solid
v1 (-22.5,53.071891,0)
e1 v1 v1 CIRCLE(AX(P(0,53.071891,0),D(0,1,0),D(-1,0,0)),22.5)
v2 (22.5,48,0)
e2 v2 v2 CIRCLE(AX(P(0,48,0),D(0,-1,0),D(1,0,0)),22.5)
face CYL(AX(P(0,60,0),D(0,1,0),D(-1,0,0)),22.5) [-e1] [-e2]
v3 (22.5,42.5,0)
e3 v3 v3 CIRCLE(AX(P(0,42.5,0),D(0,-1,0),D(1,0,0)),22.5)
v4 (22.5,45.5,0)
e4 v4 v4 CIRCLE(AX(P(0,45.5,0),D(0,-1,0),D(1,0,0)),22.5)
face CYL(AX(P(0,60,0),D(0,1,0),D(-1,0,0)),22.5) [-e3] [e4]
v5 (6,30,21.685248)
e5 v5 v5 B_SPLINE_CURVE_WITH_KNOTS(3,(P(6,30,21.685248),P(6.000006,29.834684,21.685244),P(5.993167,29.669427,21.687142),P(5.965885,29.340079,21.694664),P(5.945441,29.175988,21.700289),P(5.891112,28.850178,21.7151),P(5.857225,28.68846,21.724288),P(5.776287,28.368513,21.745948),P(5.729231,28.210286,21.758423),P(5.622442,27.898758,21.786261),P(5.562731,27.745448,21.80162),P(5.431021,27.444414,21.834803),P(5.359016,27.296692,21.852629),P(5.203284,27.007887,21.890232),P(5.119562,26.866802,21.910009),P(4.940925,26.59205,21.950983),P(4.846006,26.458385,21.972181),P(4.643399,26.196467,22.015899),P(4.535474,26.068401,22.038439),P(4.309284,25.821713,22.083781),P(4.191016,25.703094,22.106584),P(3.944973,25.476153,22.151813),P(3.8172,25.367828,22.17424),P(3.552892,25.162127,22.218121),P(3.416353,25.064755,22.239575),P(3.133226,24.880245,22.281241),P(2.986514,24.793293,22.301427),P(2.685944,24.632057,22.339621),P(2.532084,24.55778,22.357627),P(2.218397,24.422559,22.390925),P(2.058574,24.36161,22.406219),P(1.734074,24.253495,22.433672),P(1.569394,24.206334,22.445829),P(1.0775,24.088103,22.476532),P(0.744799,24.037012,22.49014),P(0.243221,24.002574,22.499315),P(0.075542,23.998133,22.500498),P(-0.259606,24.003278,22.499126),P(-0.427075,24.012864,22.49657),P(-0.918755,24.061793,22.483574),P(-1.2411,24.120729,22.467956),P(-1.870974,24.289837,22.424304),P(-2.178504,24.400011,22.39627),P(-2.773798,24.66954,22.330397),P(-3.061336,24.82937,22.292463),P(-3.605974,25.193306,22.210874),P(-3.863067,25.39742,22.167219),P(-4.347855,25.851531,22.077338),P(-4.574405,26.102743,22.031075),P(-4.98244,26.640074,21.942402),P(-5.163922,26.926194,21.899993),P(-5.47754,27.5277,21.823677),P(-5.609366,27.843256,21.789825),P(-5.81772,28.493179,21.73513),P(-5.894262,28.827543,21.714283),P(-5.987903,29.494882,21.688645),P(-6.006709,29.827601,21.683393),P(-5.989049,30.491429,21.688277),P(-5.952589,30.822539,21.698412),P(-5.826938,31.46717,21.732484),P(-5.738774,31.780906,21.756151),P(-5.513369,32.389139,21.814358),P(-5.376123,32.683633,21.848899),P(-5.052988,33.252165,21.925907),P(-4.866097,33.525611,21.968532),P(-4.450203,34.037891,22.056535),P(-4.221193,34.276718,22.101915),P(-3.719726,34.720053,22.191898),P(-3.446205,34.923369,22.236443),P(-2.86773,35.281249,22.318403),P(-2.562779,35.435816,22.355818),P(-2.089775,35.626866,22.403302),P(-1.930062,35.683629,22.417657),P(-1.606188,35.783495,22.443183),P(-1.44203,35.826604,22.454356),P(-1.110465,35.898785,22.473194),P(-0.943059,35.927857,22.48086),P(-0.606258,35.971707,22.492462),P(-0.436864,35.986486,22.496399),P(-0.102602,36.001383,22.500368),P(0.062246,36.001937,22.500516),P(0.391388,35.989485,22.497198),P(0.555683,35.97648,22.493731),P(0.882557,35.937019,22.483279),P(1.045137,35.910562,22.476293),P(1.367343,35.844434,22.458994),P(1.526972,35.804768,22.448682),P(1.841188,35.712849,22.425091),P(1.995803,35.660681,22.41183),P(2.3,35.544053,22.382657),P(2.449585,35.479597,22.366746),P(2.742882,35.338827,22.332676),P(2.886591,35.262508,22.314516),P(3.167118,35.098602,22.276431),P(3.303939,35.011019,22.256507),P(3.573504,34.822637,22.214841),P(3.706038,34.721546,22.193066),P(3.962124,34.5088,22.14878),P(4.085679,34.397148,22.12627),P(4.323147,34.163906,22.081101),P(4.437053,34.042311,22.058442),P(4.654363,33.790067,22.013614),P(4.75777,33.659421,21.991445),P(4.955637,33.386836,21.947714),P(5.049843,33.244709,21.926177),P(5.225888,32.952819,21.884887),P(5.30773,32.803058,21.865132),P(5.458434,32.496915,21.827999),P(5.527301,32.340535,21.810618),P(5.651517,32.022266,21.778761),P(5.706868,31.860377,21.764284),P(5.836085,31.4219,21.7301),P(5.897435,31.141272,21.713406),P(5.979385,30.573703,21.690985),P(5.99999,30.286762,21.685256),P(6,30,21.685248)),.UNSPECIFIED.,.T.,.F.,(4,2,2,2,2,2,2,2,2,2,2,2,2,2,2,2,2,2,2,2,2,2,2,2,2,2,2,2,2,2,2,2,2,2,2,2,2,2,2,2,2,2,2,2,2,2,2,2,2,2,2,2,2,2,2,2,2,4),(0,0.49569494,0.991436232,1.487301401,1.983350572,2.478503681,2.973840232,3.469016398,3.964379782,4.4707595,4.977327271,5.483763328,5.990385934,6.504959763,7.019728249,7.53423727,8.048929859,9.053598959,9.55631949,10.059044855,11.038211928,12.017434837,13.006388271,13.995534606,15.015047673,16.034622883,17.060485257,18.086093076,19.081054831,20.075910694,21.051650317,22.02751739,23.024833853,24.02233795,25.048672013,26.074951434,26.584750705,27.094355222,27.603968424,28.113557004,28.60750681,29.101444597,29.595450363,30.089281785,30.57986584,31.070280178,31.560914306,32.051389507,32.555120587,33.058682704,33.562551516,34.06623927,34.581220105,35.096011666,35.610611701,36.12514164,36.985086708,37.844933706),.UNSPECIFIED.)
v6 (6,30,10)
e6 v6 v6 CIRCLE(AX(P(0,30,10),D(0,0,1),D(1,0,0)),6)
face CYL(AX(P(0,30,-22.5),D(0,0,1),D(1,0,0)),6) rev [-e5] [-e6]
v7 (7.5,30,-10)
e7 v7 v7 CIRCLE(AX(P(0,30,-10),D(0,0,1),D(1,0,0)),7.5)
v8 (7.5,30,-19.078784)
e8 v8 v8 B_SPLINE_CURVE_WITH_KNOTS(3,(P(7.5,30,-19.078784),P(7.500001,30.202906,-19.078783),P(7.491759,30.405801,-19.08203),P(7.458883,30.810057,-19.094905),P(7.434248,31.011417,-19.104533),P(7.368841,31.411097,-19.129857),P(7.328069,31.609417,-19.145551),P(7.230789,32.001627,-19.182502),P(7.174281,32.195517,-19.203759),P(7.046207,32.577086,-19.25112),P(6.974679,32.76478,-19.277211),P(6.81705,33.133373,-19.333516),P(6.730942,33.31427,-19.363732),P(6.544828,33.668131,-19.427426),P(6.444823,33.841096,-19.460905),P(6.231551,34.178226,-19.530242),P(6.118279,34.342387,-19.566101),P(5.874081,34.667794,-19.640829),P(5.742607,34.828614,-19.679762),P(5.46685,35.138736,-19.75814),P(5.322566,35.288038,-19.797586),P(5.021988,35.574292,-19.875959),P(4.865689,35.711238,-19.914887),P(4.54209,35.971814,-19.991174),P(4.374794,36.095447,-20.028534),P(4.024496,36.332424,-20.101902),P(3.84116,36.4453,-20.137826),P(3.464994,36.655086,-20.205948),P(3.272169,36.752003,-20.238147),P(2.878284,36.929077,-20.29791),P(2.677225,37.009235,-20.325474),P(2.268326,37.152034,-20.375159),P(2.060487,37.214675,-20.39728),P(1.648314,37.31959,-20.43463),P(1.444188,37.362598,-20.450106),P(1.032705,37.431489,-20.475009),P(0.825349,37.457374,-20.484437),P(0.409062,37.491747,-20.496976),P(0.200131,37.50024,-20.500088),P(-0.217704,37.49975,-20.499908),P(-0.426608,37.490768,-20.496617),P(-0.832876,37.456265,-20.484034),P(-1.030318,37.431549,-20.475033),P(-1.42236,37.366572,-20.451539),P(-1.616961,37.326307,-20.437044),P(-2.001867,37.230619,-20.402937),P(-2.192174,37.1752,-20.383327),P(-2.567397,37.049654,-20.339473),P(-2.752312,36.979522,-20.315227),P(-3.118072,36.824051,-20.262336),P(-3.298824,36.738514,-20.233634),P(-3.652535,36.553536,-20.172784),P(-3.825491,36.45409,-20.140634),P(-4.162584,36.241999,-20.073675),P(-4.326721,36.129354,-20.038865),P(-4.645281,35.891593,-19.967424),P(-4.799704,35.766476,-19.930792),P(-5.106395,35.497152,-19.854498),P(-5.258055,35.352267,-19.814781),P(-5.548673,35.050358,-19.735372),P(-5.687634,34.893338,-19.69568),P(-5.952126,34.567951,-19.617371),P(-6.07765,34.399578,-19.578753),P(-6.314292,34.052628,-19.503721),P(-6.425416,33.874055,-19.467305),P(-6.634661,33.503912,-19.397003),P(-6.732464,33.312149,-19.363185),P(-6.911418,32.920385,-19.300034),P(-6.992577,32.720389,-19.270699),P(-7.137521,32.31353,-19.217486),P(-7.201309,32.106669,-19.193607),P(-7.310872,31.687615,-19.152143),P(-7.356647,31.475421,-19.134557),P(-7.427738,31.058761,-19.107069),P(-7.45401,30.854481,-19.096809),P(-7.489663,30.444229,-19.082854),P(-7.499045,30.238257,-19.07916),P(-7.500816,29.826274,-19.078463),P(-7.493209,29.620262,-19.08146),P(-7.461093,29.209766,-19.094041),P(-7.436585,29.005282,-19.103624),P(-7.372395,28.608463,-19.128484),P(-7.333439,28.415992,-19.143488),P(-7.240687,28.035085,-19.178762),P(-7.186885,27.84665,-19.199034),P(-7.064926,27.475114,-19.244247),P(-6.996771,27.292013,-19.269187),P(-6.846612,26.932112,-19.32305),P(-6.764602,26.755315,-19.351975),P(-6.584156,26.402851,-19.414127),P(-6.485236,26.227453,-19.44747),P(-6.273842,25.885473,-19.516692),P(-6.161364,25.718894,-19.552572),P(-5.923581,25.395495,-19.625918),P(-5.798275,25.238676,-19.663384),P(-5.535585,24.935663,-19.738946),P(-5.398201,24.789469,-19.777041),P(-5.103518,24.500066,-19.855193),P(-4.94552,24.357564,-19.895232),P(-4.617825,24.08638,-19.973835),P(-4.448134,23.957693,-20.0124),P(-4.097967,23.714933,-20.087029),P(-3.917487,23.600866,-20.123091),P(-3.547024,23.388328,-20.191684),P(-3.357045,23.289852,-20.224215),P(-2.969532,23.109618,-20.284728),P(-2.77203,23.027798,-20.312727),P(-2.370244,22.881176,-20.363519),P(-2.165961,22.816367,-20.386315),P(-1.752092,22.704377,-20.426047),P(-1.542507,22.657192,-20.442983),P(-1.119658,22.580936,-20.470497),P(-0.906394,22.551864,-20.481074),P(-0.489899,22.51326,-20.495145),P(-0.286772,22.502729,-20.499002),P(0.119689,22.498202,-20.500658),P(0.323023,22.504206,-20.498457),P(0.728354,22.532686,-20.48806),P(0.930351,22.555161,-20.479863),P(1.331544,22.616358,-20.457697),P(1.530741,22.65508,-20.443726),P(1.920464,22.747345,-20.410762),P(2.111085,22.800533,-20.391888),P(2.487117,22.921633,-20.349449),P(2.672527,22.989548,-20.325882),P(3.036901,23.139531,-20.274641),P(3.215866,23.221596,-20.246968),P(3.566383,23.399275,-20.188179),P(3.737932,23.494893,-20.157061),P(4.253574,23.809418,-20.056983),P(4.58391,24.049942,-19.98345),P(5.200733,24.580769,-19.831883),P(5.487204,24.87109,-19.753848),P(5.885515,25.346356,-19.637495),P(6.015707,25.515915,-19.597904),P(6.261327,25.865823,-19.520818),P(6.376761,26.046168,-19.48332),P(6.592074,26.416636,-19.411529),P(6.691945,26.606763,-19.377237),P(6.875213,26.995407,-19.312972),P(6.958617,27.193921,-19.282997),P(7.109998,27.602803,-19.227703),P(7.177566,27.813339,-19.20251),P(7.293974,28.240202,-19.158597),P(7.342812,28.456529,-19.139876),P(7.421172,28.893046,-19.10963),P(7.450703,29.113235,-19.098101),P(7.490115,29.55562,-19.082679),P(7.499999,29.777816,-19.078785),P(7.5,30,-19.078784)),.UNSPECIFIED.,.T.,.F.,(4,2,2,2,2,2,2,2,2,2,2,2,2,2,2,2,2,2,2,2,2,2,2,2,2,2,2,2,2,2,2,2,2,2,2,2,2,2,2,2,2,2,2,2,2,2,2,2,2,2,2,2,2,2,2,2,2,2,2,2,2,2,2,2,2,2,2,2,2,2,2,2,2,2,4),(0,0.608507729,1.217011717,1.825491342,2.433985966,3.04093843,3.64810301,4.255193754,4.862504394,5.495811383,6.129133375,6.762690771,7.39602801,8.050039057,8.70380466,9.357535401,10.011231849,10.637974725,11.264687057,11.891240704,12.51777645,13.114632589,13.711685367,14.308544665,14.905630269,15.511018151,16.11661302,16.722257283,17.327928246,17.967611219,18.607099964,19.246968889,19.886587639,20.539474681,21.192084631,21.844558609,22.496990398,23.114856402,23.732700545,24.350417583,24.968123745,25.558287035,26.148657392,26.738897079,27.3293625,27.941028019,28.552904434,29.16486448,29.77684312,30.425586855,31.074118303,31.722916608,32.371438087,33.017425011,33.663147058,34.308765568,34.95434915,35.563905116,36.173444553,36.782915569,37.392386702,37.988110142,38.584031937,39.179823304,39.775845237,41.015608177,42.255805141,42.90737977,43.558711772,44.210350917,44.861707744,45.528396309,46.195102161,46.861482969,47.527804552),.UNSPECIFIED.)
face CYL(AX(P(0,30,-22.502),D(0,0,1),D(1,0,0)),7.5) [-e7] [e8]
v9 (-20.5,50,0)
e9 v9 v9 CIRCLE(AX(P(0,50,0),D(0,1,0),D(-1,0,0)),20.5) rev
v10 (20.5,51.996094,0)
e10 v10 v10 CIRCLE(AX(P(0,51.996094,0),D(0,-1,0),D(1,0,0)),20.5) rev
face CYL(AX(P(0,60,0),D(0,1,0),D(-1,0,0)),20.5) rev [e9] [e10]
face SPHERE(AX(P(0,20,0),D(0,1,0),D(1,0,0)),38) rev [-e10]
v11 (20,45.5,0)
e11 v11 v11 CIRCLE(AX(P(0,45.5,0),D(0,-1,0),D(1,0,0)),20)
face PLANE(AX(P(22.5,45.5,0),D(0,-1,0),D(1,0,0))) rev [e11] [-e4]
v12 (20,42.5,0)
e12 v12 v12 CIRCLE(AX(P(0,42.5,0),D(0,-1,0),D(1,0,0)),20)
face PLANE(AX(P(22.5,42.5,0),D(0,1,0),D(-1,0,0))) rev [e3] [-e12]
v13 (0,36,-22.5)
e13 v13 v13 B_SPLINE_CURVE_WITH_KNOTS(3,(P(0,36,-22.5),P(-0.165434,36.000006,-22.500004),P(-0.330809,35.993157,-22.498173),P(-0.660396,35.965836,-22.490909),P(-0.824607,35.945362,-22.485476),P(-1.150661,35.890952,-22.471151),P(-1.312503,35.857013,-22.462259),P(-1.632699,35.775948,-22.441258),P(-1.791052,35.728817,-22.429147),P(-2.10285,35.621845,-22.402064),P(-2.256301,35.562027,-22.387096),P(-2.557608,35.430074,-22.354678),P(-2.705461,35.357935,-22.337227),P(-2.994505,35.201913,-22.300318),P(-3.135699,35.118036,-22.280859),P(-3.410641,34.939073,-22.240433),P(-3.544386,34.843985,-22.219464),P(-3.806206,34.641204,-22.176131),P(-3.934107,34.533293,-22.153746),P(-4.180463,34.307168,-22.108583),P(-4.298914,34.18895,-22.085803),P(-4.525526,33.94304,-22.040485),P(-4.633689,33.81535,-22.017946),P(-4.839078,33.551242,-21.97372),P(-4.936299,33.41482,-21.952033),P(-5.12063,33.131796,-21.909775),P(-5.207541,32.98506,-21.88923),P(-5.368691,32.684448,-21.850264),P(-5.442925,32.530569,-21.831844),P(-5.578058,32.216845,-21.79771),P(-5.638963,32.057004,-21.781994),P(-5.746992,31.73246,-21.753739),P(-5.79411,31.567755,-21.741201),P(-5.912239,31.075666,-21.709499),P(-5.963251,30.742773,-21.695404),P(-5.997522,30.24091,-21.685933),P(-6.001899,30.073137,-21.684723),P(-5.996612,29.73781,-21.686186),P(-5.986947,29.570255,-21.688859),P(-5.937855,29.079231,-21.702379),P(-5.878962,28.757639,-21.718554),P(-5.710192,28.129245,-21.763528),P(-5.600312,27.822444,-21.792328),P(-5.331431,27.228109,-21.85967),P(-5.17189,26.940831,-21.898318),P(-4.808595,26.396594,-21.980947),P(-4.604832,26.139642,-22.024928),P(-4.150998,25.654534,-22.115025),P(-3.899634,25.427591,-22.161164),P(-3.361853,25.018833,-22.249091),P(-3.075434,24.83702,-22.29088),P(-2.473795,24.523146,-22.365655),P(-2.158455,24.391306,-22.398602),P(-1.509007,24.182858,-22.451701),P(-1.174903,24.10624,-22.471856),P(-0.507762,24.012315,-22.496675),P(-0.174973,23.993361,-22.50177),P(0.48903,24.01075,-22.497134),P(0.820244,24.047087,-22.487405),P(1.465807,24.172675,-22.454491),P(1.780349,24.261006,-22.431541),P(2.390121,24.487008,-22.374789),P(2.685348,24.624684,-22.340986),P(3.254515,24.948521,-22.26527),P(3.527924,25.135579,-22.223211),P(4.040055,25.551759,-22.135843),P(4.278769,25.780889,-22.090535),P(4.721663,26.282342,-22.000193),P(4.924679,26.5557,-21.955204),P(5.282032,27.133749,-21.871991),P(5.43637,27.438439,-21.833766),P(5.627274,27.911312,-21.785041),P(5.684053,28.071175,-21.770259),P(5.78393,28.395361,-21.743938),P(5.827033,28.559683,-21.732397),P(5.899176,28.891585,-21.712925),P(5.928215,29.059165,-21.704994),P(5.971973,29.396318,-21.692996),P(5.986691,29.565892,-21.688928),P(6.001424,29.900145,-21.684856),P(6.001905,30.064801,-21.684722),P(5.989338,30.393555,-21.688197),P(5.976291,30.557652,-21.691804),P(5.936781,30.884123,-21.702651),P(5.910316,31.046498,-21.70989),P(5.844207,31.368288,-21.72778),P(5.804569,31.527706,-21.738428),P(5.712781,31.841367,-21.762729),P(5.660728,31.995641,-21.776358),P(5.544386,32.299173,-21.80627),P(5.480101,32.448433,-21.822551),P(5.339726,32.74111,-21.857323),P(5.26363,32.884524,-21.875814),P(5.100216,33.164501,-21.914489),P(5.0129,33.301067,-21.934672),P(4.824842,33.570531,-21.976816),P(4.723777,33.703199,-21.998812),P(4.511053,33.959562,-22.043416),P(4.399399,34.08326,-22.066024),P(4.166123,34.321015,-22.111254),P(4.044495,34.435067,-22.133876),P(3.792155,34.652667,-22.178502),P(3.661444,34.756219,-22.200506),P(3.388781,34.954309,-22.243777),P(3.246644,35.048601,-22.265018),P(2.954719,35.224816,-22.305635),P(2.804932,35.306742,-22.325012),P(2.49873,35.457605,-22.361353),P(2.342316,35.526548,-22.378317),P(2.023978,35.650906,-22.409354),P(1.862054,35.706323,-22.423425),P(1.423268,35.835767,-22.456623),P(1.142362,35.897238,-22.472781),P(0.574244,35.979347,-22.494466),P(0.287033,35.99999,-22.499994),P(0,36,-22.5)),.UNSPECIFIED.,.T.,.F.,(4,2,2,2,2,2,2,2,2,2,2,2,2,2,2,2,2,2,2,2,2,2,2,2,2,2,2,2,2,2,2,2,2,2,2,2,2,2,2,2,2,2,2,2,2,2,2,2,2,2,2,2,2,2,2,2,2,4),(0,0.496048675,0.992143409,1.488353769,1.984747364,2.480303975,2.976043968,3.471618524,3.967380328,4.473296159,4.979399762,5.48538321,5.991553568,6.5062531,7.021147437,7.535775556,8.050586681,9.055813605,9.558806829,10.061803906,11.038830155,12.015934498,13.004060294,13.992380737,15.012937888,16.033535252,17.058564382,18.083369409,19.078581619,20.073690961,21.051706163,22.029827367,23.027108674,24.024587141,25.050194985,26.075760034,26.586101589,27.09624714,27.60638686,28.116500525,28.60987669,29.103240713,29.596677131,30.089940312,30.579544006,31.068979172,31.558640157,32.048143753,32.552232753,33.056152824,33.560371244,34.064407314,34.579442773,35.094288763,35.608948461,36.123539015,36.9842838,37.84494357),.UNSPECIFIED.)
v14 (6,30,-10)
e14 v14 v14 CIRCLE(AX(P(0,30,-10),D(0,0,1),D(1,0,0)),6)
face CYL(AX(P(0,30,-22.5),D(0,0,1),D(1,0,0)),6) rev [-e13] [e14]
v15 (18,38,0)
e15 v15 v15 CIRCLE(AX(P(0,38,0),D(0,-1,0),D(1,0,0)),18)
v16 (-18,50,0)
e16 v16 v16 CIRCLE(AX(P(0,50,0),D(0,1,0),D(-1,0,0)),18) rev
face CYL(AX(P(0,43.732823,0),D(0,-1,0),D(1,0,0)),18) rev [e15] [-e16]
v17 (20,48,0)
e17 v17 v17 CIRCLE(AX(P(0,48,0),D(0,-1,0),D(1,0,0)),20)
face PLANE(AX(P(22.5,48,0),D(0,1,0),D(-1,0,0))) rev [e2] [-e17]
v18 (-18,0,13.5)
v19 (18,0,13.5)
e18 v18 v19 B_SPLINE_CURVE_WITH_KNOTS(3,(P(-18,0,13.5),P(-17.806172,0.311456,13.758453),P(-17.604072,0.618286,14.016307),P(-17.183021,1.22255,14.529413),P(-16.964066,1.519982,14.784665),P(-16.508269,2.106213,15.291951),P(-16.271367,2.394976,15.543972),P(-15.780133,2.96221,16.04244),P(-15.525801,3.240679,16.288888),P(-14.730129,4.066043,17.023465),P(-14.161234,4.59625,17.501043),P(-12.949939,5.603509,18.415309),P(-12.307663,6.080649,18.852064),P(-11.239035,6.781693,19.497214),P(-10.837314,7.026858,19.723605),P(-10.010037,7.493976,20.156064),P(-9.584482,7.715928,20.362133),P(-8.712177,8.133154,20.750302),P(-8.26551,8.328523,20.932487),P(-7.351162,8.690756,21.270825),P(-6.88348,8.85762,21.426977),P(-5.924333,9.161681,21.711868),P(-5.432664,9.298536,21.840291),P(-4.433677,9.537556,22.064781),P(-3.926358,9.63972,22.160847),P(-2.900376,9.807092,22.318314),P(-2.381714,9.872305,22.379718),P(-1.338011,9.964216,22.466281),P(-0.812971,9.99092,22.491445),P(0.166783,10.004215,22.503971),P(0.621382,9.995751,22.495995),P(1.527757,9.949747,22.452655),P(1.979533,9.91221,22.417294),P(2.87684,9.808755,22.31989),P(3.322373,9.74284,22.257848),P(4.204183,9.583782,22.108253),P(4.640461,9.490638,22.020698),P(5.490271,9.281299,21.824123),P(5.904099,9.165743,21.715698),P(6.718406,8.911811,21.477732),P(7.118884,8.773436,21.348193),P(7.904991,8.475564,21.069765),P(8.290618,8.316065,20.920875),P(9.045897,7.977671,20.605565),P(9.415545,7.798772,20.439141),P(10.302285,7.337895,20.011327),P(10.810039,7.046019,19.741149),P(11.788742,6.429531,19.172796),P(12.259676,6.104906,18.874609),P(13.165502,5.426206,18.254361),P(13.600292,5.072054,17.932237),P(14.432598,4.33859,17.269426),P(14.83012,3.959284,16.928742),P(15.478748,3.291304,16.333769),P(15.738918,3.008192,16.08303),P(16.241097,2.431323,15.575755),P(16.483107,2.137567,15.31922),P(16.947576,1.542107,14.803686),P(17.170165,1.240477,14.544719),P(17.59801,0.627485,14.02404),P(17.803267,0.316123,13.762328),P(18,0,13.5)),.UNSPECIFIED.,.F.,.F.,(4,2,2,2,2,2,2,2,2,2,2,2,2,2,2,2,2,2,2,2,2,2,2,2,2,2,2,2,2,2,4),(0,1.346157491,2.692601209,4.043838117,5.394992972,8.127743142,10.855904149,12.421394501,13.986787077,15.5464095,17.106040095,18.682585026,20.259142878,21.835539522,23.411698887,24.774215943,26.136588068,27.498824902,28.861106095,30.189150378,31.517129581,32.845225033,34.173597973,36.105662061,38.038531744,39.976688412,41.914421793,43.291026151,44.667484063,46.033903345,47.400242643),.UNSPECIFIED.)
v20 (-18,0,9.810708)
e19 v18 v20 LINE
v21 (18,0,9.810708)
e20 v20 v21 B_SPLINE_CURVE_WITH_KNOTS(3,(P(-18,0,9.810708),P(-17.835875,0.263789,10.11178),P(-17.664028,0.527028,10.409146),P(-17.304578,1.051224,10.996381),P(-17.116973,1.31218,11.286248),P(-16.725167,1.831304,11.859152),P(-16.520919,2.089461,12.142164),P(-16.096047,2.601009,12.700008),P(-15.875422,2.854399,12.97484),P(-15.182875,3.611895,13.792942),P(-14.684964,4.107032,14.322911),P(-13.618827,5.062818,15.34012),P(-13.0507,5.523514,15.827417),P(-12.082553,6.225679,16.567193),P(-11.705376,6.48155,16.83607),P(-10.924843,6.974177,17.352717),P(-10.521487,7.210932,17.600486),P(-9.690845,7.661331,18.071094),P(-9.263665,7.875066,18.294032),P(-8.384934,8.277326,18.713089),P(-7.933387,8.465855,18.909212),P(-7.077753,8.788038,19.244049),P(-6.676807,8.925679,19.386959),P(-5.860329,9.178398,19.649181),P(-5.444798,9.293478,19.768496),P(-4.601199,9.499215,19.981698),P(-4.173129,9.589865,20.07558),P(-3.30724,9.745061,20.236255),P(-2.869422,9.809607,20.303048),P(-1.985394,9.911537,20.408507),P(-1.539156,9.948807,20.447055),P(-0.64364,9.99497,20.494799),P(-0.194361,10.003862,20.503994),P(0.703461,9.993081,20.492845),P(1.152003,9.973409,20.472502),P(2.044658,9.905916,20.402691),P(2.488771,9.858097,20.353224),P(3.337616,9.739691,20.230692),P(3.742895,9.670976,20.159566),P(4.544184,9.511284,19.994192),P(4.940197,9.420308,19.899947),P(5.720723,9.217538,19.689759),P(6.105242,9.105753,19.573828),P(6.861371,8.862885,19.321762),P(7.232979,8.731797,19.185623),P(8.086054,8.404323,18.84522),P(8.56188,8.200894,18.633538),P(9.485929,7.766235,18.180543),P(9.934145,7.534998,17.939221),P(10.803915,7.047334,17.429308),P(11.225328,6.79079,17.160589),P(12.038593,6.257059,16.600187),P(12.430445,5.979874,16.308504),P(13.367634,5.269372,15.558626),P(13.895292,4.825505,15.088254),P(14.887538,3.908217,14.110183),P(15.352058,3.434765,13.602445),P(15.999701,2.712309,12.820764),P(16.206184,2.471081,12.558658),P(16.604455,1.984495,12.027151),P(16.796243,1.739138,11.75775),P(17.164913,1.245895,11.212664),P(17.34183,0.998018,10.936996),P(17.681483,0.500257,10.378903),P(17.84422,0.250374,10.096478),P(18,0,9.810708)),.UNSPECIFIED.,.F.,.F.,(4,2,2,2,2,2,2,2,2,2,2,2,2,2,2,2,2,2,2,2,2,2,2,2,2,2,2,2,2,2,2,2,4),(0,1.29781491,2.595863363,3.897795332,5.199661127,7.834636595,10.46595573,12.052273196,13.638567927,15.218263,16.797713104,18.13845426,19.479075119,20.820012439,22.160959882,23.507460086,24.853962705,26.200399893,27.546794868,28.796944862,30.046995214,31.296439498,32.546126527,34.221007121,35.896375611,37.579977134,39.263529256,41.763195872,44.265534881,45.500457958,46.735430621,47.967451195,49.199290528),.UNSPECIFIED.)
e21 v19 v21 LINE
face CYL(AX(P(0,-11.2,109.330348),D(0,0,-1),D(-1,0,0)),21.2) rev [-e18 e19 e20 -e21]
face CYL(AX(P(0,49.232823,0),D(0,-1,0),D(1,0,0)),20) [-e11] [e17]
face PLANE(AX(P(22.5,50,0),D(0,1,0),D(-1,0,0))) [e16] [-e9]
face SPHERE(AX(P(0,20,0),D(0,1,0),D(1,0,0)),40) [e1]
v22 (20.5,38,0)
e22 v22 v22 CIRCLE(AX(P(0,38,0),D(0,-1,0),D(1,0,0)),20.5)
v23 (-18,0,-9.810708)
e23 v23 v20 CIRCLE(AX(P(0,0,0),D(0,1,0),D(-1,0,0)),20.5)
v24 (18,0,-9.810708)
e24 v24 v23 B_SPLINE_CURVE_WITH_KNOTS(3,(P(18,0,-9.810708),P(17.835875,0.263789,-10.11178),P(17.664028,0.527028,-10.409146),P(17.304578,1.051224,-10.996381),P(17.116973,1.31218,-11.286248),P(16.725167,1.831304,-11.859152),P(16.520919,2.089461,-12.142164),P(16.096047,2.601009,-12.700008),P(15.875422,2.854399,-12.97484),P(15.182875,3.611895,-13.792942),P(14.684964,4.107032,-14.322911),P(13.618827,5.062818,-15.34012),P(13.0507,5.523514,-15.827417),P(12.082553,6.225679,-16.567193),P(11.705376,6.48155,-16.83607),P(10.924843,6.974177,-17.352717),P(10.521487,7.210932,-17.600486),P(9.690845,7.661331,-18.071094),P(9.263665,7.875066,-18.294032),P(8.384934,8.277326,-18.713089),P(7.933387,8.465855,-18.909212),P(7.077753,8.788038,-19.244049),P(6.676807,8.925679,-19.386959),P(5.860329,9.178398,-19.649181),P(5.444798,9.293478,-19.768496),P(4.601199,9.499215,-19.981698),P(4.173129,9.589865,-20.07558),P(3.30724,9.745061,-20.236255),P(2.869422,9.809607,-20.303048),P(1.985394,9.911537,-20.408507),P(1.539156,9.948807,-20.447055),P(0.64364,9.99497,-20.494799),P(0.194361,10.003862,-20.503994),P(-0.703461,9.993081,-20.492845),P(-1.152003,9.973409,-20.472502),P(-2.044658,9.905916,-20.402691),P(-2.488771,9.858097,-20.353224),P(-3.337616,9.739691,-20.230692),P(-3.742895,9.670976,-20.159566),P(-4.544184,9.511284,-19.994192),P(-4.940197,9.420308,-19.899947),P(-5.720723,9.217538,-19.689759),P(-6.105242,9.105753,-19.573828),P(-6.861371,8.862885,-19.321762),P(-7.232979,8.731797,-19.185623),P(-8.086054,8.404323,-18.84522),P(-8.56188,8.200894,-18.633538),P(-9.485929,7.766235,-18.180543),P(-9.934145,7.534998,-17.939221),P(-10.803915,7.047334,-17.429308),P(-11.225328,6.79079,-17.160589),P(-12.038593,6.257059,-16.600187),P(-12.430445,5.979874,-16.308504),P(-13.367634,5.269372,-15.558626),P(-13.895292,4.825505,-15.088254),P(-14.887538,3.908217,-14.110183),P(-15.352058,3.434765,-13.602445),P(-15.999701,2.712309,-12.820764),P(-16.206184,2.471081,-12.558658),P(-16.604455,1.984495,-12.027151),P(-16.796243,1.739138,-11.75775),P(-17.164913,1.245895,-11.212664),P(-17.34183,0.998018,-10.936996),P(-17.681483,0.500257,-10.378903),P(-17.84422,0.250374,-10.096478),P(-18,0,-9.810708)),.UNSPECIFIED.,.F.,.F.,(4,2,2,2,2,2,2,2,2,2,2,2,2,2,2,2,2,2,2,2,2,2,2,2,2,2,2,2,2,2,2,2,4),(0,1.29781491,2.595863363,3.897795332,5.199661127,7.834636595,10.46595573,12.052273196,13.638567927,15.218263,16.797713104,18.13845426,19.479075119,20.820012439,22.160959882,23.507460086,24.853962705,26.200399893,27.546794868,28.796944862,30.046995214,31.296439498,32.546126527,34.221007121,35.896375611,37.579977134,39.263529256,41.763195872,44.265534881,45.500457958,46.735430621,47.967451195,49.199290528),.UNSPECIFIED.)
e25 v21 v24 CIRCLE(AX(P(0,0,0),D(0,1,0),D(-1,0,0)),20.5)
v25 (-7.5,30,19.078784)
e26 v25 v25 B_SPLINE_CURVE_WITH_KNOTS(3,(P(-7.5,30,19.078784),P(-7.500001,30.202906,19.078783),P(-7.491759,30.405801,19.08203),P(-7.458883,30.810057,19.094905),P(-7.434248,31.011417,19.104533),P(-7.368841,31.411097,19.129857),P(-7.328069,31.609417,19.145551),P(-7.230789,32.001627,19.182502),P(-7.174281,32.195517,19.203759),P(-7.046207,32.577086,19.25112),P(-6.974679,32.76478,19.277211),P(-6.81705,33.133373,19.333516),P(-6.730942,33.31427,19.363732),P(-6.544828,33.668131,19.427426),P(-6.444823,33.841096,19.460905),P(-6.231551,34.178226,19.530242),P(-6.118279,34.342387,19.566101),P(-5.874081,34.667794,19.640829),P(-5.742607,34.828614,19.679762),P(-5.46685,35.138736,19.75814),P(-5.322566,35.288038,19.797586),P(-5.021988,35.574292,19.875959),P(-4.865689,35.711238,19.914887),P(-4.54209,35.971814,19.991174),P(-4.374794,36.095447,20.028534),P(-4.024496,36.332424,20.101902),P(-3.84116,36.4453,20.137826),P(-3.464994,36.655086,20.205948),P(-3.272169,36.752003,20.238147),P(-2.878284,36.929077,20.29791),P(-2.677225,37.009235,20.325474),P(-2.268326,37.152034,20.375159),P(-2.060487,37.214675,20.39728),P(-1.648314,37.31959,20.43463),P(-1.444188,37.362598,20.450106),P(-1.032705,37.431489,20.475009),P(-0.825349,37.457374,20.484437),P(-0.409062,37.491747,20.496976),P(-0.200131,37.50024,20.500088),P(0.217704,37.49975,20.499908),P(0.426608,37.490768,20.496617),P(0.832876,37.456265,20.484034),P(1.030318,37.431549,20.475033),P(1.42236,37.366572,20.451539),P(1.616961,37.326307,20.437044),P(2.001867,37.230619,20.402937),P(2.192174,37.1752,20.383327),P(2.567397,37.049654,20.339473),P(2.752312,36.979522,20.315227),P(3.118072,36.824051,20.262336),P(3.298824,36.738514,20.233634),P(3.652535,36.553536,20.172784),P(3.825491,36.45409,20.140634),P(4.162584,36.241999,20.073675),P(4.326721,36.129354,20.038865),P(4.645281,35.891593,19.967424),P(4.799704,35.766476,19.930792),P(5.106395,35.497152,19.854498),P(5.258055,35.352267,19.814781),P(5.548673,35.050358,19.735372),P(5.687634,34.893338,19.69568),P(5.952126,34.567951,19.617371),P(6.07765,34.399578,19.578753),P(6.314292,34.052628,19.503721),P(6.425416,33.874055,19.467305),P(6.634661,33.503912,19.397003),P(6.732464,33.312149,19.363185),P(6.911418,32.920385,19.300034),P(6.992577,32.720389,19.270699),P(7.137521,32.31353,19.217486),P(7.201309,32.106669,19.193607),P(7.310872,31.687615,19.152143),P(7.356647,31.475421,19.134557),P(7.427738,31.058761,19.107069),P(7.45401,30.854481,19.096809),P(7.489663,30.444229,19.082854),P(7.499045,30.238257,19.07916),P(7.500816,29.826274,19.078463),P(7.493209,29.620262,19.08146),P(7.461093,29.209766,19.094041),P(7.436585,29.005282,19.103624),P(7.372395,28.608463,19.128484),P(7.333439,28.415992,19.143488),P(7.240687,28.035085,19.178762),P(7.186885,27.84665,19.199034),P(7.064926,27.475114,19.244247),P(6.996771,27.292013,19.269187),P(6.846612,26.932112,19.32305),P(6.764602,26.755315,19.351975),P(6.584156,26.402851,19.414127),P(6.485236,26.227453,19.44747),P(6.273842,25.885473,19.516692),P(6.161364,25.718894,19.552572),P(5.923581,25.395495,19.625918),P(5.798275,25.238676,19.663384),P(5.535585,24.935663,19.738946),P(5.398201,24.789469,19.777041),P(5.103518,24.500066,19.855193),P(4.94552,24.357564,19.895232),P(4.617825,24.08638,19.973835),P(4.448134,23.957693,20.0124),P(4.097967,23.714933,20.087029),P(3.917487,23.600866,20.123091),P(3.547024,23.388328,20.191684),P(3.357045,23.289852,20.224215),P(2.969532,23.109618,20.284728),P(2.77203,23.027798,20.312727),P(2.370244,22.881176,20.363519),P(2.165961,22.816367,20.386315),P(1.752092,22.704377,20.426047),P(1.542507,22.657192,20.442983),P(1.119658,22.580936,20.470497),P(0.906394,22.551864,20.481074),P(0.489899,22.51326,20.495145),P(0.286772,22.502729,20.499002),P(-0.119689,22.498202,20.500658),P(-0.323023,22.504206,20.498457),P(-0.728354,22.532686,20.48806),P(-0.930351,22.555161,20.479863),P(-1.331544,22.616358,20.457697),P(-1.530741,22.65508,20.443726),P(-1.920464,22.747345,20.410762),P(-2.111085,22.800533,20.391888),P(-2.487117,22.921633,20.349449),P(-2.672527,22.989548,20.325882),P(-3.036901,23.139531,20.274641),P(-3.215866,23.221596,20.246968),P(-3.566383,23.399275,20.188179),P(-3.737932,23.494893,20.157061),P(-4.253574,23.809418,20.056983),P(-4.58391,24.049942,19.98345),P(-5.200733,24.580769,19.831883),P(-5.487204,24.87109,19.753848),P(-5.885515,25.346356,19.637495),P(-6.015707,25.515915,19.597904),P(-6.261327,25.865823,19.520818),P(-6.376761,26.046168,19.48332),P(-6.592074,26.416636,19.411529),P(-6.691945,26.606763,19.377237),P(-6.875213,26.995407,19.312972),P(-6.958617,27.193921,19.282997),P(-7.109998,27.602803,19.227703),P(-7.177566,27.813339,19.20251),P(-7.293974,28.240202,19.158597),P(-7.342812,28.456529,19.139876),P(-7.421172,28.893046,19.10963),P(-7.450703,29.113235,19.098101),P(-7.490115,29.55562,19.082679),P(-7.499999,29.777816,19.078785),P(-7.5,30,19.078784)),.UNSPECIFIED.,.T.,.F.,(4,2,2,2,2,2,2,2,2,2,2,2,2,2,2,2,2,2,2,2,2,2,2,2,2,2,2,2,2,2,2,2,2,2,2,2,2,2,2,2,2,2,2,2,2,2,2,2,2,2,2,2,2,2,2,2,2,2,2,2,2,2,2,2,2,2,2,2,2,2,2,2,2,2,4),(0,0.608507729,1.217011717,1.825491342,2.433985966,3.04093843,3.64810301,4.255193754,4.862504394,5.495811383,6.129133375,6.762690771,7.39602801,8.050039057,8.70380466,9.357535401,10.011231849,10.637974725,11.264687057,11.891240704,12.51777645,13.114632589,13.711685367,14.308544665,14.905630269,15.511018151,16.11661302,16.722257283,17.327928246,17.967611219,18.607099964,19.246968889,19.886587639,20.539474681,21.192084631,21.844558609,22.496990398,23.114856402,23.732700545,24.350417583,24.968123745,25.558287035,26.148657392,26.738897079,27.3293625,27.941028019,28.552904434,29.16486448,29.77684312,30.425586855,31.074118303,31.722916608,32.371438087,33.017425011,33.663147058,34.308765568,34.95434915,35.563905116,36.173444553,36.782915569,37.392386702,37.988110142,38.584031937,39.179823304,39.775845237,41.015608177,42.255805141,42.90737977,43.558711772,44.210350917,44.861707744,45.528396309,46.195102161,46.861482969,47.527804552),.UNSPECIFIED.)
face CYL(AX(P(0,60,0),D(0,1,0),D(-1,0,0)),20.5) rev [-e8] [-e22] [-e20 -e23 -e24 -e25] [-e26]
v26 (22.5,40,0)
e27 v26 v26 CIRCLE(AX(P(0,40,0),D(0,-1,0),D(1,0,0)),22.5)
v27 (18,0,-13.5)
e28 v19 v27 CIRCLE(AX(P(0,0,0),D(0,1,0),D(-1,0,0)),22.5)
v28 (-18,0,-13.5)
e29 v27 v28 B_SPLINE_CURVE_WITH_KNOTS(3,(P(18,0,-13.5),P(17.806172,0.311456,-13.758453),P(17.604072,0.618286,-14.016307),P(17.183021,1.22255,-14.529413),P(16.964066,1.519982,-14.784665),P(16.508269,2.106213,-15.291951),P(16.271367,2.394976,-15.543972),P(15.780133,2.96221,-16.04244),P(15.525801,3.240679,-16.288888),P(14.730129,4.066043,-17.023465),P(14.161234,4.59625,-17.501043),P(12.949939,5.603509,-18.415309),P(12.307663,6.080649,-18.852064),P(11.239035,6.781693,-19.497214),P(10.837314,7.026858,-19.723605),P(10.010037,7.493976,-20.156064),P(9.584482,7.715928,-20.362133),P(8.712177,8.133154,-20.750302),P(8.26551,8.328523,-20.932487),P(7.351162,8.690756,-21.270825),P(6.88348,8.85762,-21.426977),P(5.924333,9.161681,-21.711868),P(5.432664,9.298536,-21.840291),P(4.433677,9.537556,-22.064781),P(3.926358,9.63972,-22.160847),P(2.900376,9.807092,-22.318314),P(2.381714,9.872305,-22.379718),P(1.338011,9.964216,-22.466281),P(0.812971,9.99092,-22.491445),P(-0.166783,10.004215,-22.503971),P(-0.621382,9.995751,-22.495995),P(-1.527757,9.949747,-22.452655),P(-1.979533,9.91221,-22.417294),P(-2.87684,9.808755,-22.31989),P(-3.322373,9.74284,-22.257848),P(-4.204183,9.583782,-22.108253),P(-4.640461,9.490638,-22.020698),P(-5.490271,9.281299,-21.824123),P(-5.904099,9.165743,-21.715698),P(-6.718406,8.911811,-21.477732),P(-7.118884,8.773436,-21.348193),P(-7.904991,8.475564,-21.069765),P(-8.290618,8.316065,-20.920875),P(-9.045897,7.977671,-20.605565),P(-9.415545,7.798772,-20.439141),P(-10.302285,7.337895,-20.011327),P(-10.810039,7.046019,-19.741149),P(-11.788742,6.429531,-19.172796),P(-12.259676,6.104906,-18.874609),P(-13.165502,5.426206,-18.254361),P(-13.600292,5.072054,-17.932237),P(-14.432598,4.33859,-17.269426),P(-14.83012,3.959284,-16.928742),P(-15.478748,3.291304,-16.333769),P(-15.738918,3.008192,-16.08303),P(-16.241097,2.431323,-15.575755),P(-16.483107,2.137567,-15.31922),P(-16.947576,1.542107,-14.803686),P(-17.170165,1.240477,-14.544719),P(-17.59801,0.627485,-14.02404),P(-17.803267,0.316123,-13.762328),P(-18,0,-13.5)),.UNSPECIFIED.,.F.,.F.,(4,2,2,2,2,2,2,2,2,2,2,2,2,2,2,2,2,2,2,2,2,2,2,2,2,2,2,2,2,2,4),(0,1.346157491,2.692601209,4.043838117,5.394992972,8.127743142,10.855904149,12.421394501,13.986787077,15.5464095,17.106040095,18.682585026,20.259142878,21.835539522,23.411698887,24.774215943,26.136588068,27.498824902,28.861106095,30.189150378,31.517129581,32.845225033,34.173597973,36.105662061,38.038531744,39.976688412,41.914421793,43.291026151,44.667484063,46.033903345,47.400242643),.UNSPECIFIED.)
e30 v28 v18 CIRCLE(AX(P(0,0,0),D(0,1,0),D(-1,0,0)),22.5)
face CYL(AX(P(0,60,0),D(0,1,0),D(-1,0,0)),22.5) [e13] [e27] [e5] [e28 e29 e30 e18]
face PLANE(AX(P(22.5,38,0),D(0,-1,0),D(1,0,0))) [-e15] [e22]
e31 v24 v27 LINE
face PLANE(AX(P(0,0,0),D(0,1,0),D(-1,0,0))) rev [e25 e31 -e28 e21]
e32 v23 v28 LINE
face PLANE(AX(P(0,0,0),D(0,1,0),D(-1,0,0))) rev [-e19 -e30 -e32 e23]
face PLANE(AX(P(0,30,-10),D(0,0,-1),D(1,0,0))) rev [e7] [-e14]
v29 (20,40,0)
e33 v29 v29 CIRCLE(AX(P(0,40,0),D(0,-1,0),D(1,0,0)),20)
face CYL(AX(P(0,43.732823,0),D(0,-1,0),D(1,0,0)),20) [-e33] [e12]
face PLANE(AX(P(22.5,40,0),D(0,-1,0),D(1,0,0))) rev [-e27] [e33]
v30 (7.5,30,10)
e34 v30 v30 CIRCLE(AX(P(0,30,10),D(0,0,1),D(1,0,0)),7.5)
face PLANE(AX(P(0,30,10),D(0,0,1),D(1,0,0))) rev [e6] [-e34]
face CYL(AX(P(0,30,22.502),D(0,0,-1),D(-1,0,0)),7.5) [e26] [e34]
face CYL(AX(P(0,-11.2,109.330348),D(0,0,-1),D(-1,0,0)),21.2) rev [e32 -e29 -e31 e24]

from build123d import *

# Parameters (mm, degrees)
SZKIC2_W                         = 2.5
SZKIC2_H                         = 2.5
SZYK_LINIOWY1_COUNT              = 2
SZYK_LINIOWY1_PITCH              = 5.5
WYTNIJ_WYCI_GNI_CIE1_DEPTH       = 68.915388536
WYTNIJ_WYCI_GNI_CIE1_DEPTH_BACK  = 68.915388536
WYTNIJ_WYCI_GNI_CIE2_DEPTH       = 68.915388602
WYTNIJ_WYCI_GNI_CIE2_DEPTH_BACK  = 68.915388602
SZKIC4_R                         = 6
DODANIE_WYCI_GNI_CIE1_REACH      = 79.915
DODANIE_WYCI_GNI_CIE1_END_RADIUS = 20.5
DODANIE_WYCI_GNI_CIE1_START      = 10
SZKIC5_R                         = 7.5
SZKIC5_R_2                       = 6


# Read off the part's stored shape, not the designer's step: Skorupa1
with BuildPart() as part:
    # Szkic1 → Obrót1 (revolve)
    with BuildSketch(Plane.XY, mode=Mode.PRIVATE) as obr_t1_sk:
        with BuildLine():
            Line((0, 0), (22.5, 0))
            Line((22.5, 0), (22.5, 53.071891388))
            ThreePointArc((22.5, 53.071891388), (11.771243445, 58.228756555), (0, 60))
            Line((0, 60), (0, 0))
        make_face()
    revolve(obr_t1_sk.sketch.rotate(Axis((0, 60, 0), (0, -1, 0)), 180), axis=Axis((0, 60, 0), (0, -1, 0)))

    # Szkic2 → Wycięcie-obrót1 (revolve, cut)
    with BuildSketch(Plane.XY):
        with Locations((21.25, 41.25)):
            Rectangle(SZKIC2_W, SZKIC2_H)
    wyci_cie_obr_t1 = revolve(axis=Axis((0, 43.732823124, 0), (0, 1, 0)), mode=Mode.SUBTRACT)

    # Szyk liniowy1: Wycięcie-obrót1 ×2
    with Locations(*[(0, i * SZYK_LINIOWY1_PITCH, 0) for i in range(1, SZYK_LINIOWY1_COUNT)]):
        add(wyci_cie_obr_t1, mode=Mode.SUBTRACT)

    # Skorupa1 outline → Skorupa1 (revolve, cut)
    with BuildSketch(Plane.XY):
        with BuildLine():
            Line((20.5, 0), (20.5, 38))
            Line((20.5, 38), (18, 38))
            Line((18, 38), (18, 50))
            Line((18, 50), (20.5, 50))
            Line((20.5, 50), (20.500000011, 51.996093505))
            ThreePointArc((20.500000011, 51.996093505), (10.680553516, 56.468147425), (0, 58))
            Line((0, 58), (0, 0))
            Line((0, 0), (20.5, 0))
        make_face()
    revolve(axis=Axis((0, 0, 0), (0, 1, 0)), mode=Mode.SUBTRACT)

    # Szkic3 → Wytnij-wyciągnięcie1 (cut, two sides: drawn at the far end of the back side and taken through both)
    with BuildSketch(Plane.XY.offset(-WYTNIJ_WYCI_GNI_CIE1_DEPTH_BACK)):
        with BuildLine():
            Line((-99.770112831, -131.416252764), (-18, 0))
            ThreePointArc((-18, 0), (0, 10), (18, 0))
            Line((18, 0), (99.770112831, -131.416252764))
            Line((99.770112831, -131.416252764), (99.770112831, -440.974537052))
            Line((99.770112831, -440.974537052), (-99.770112831, -440.974537052))
            Line((-99.770112831, -440.974537052), (-99.770112831, -131.416252764))
        make_face()
    extrude(amount=WYTNIJ_WYCI_GNI_CIE1_DEPTH + WYTNIJ_WYCI_GNI_CIE1_DEPTH_BACK, mode=Mode.SUBTRACT)

    # Szkic4 → Wytnij-wyciągnięcie2 (cut, two sides: drawn at the far end of the back side and taken through both)
    with BuildSketch(Plane.XY.offset(-WYTNIJ_WYCI_GNI_CIE2_DEPTH_BACK)):
        with Locations((0, 30)):
            Circle(SZKIC4_R)
    extrude(amount=WYTNIJ_WYCI_GNI_CIE2_DEPTH + WYTNIJ_WYCI_GNI_CIE2_DEPTH_BACK, mode=Mode.SUBTRACT)

    # Dodanie-wyciągnięcie1: up to this cylinder (the profile starts inside it)
    dodanie_wyci_gni_cie1_end = Plane(origin=(0, 30, 0), z_dir=(0, 1, 0)) * Cylinder(DODANIE_WYCI_GNI_CIE1_END_RADIUS, 201.83, mode=Mode.PRIVATE)
    # Szkic5 → Dodanie-wyciągnięcie1 (add, up to the surface)
    with BuildSketch(Plane.XY.offset(DODANIE_WYCI_GNI_CIE1_START), mode=Mode.PRIVATE) as dodanie_wyci_gni_cie1_sk1:
        with Locations(Location((0, 30, 0), (0, 0, 180))):
            Circle(SZKIC5_R)
        with Locations((0, 30)):
            Circle(SZKIC5_R_2, mode=Mode.SUBTRACT)
    dodanie_wyci_gni_cie1_tool1 = extrude(dodanie_wyci_gni_cie1_sk1.sketch, amount=DODANIE_WYCI_GNI_CIE1_REACH, mode=Mode.PRIVATE) & dodanie_wyci_gni_cie1_end
    dodanie_wyci_gni_cie1 = dodanie_wyci_gni_cie1_tool1.solids().sort_by_distance((7.287868, 30, 10))[0]
    add(dodanie_wyci_gni_cie1)

    # Lustro1: Dodanie-wyciągnięcie1 across plane
    add(dodanie_wyci_gni_cie1.mirror(Plane.XY))


solid = part.part
